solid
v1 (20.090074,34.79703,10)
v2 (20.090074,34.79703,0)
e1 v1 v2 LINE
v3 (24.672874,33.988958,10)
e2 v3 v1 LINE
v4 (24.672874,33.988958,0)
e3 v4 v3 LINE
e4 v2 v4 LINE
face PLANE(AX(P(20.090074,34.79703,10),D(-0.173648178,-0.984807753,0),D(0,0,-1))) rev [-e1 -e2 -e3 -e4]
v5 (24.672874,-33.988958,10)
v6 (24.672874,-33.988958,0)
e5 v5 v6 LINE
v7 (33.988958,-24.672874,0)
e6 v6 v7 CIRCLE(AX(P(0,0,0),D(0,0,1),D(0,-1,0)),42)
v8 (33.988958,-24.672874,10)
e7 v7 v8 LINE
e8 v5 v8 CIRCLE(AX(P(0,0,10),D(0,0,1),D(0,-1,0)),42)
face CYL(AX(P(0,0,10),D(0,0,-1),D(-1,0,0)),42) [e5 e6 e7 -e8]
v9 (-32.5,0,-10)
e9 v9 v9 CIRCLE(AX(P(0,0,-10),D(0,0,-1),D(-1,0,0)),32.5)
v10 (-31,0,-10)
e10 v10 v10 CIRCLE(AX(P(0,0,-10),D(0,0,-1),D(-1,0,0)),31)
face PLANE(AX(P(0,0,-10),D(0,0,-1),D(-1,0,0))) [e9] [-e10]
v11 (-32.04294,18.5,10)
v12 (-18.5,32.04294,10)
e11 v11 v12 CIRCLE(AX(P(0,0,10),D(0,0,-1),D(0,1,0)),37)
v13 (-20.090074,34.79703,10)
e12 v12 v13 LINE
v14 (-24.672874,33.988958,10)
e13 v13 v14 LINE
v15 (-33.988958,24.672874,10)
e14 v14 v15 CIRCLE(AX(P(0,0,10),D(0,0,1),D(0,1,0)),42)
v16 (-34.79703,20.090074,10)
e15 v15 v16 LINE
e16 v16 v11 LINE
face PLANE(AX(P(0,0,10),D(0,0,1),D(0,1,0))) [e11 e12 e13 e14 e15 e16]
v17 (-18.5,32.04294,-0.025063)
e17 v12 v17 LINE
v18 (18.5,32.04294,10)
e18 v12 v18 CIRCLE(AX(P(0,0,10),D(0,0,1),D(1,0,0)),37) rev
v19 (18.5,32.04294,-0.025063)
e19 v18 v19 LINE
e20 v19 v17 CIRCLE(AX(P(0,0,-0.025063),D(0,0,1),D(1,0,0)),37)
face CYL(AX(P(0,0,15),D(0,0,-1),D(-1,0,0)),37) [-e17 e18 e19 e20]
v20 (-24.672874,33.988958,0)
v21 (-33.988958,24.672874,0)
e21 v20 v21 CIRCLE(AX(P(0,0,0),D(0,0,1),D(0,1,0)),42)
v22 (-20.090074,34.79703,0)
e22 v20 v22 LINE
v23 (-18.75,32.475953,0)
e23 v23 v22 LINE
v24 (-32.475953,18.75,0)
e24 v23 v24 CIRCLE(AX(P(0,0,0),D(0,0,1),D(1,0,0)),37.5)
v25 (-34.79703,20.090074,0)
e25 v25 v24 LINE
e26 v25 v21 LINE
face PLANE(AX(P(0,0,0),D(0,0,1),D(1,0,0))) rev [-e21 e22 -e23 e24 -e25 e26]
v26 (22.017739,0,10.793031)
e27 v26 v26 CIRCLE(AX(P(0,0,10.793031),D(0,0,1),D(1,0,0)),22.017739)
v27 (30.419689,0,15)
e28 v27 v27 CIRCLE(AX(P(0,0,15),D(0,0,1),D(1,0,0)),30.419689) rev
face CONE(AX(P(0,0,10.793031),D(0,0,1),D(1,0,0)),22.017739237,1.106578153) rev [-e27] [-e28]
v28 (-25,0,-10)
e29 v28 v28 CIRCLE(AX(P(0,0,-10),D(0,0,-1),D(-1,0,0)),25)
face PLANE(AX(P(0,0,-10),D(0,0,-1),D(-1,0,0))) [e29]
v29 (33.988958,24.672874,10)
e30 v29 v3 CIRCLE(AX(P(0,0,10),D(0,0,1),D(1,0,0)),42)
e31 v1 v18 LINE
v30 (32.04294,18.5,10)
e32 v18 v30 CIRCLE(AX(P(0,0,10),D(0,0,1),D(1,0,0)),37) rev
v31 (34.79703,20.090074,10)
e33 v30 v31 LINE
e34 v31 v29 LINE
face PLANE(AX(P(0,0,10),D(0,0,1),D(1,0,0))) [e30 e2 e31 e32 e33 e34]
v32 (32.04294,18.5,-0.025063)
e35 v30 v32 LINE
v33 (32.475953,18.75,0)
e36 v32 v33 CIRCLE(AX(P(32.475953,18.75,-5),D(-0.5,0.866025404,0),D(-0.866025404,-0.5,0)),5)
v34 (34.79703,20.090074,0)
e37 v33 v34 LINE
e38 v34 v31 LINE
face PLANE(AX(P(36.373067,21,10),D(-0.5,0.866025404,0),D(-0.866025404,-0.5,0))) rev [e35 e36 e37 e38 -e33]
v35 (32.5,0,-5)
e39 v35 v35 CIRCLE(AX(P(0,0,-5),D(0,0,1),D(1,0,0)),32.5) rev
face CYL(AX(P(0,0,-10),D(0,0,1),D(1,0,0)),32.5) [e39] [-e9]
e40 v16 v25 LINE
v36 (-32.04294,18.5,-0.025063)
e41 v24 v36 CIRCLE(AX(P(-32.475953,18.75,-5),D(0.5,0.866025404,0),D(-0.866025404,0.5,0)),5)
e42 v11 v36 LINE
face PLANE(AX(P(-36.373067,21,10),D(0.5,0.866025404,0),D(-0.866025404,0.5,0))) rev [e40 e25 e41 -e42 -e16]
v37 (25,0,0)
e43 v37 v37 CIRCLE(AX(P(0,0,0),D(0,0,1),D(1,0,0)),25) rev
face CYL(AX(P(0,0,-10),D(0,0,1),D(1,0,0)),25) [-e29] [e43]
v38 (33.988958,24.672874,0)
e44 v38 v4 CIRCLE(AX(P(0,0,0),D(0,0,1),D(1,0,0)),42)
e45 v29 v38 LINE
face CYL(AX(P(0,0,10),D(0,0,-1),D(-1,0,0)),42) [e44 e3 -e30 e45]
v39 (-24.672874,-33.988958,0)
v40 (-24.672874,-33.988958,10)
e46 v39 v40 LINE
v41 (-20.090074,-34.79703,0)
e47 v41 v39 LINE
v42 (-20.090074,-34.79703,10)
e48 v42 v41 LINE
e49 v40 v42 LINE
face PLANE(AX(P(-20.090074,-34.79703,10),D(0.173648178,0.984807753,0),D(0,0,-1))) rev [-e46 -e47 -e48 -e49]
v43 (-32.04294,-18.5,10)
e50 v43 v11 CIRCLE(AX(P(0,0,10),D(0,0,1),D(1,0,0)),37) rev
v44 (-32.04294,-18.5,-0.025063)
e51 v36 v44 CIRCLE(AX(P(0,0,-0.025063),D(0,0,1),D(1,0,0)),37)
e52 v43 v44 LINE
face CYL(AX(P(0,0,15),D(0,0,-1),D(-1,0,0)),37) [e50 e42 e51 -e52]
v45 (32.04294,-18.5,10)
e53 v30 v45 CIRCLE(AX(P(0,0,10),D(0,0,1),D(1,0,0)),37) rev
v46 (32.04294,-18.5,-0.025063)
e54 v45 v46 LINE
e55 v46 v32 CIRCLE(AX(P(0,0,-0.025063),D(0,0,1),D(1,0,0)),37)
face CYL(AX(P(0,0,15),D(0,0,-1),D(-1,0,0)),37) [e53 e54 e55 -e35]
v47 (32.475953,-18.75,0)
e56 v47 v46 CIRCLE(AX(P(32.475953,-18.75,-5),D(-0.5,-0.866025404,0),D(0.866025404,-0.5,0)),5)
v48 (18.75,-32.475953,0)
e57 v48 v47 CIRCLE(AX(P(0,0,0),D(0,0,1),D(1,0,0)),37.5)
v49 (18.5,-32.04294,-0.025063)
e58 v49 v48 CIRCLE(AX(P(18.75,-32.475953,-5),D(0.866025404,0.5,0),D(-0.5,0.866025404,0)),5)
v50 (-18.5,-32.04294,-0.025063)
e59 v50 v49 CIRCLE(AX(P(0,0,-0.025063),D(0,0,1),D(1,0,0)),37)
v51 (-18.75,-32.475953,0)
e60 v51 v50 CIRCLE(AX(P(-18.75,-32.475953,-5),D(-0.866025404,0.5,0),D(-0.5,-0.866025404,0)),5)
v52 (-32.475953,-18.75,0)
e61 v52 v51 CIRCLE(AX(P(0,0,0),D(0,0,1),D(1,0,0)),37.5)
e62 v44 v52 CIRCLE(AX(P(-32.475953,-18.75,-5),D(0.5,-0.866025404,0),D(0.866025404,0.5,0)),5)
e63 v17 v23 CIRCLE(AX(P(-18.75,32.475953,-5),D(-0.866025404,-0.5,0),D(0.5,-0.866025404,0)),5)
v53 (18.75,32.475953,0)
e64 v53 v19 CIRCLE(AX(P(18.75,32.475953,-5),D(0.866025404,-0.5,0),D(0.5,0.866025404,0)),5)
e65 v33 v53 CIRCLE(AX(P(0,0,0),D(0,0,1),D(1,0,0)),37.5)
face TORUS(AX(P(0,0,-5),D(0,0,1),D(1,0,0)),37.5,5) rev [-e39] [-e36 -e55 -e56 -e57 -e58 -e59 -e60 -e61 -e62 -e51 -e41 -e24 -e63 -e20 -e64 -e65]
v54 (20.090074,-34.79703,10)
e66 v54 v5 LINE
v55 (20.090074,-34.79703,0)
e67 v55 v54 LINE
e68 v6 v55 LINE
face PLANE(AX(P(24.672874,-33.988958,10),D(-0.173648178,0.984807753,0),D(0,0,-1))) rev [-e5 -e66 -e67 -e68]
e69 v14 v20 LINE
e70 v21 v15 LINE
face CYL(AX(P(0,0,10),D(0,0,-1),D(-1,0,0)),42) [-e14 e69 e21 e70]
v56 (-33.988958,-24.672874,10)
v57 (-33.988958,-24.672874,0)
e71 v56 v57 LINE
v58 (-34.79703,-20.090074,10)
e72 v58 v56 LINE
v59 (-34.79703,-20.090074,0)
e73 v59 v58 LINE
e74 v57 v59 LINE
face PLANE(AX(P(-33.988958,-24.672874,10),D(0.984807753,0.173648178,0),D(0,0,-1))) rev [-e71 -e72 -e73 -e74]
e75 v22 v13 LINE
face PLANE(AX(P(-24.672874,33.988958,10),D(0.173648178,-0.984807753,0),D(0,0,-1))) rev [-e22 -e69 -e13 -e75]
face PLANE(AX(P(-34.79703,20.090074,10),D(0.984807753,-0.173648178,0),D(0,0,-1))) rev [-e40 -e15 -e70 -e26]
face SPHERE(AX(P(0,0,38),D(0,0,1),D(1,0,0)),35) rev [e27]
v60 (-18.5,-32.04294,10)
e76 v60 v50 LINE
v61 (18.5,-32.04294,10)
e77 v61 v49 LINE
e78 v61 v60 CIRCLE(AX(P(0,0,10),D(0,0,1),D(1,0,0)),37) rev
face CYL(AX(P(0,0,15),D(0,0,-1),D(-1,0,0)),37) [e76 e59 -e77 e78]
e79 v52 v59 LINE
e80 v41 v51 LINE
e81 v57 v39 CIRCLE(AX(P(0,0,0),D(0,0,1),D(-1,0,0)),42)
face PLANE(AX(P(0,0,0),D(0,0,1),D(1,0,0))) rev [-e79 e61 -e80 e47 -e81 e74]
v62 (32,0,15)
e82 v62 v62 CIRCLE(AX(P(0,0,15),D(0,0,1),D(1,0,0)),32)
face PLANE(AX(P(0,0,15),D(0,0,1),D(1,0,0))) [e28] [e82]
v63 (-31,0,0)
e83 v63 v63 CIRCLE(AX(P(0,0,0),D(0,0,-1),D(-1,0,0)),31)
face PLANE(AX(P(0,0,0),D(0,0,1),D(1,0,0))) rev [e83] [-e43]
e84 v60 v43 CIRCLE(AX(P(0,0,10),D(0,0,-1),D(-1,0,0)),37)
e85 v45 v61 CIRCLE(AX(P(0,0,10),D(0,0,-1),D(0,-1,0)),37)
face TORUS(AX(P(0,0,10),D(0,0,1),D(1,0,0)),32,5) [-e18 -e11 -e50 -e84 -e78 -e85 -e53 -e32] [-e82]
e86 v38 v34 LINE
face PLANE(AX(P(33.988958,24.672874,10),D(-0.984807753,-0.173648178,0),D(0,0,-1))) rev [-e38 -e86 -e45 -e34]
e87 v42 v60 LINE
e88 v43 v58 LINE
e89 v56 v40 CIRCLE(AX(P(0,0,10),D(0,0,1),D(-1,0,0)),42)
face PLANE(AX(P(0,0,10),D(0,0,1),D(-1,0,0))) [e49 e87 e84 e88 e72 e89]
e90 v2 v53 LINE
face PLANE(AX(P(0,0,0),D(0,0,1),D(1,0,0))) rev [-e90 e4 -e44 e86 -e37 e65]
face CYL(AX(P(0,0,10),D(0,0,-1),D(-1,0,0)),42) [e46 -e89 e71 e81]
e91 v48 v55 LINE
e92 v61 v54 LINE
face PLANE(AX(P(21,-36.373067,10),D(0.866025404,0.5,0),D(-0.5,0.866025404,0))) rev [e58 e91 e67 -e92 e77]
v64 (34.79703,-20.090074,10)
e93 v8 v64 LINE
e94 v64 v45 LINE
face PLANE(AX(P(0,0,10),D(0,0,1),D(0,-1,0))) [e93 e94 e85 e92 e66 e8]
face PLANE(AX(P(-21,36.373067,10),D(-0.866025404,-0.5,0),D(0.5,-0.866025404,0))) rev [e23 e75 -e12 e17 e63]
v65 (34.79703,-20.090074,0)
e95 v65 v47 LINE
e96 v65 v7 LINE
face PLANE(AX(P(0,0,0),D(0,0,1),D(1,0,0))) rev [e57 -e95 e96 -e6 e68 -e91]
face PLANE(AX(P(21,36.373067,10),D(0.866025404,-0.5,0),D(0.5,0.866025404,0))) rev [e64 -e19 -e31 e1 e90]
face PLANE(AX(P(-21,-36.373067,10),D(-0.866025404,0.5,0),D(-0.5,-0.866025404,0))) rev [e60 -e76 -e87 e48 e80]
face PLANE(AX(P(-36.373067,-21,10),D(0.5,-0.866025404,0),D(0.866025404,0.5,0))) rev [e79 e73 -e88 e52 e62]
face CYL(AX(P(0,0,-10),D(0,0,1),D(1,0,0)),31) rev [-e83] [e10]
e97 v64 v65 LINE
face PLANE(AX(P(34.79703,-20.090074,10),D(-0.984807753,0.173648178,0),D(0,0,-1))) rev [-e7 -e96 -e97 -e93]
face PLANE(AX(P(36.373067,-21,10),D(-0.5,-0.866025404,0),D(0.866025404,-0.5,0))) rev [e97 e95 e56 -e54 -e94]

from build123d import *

# Parameters (mm, degrees)
SKETCH_1_R                           = 37
EXTRUDE_1_DEPTH                      = 15
FILLET_2_R                           = 5
EXTRUDE_3_DEPTH                      = 10
CHAMFER_2_SIZE                       = 1.819851171
CHAMFER_3_SIZE                       = 1.819851171
PATTERN_CIRCULAR_4_COUNT             = 4
CHAMFER_2_OF_PATTERN_CIRCULAR_4_SIZE = 1.819851171
CHAMFER_3_OF_PATTERN_CIRCULAR_4_SIZE = 1.819851171
SKETCH_9_R                           = 32.5
SKETCH_9_R_2                         = 31
EXTRUDE_4_DEPTH                      = 10
SKETCH_9_3_R                         = 25
EXTRUDE_5_DEPTH                      = 10
FILLET_3_R                           = 5


with BuildPart() as part:
    # 草圖1 → 填料-伸長1 (new body)
    with BuildSketch(Plane.XY):
        Circle(SKETCH_1_R)
    extrude(amount=EXTRUDE_1_DEPTH)

    # 草圖2 → 除料-旋轉2 (revolve, cut)
    with BuildSketch(Plane.XY.offset(38)):
        with BuildLine():
            Line((-35, 0), (35, 0))
            ThreePointArc((35, 0), (0, -35), (-35, 0))
        make_face()
    revolve(axis=Axis((-35, 0, 38), (1, 0, 0)), mode=Mode.SUBTRACT)

    # 導角1: read off the stored shape, not the designer's step
    # 導角1 outline → 導角1 (revolve, cut)
    with BuildSketch(Plane.XZ):
        Polygon((22.017739237, 15), (22.017739237, 10.79303106), (30.419689063, 15), align=None)
    revolve(axis=Axis((0, 0, 0), (0, 0, 1)), mode=Mode.SUBTRACT)

    # 圓角2
    fillet_2_edges = [part.edges().sort_by_distance(p)[0] for p in [
        (-37, 0, 15),
    ]]
    fillet(fillet_2_edges, radius=FILLET_2_R)

    # 草圖8 → 填料-伸長3 (add)
    with BuildSketch(Plane.XY):
        with BuildLine():
            Line((21, 36.373066959), (18.5, 32.04293994))
            ThreePointArc((18.5, 32.04293994), (26.162950904, 26.162950904), (32.04293994, 18.5))
            Line((32.04293994, 18.5), (36.373066959, 21))
            ThreePointArc((36.373066959, 21), (29.69848481, 29.69848481), (21, 36.373066959))
        make_face()
    extrude_3 = extrude(amount=EXTRUDE_3_DEPTH)

    # 導角2
    # the kernel refuses this chamfer: 5, 1.819851171 mm, written as the material it takes off along each edge
    with BuildSketch(Plane(origin=(21, 36.373066959, -11.408988882), x_dir=(-0.5000000000000003, -0.8660254037844385, 0), z_dir=(0, 0, 1))) as chamfer_2_piece_1:
        with BuildLine():
            Line((CHAMFER_2_SIZE, 0), (0.22826162, 4.372856354))
            ThreePointArc((0.22826162, 4.372856354), (0.06200601, 2.281372415), (0, 0))
            Line((0, 0), (CHAMFER_2_SIZE, 0))
        make_face()
    extrude(amount=32.817977764, mode=Mode.SUBTRACT)

    # 導角3
    # the kernel refuses this chamfer: 5, 1.819851171 mm, written as the material it takes off along each edge
    with BuildSketch(Plane(origin=(36.373066959, 21, -11.408988882), x_dir=(-0.8660254037844387, -0.5000000000000001, 0), z_dir=(0, 0, 1))) as chamfer_3_piece_1:
        with BuildLine():
            Line((CHAMFER_3_SIZE, 0), (0.22826162, -4.372856354))
            ThreePointArc((0.22826162, -4.372856354), (0.06200601, -2.281372415), (0, 0))
            Line((0, 0), (CHAMFER_3_SIZE, 0))
        make_face()
    extrude(amount=32.817977764, mode=Mode.SUBTRACT)

    # 環狀複製排列4: 填料-伸長3 ×4 about axis
    pattern_circular_4_axis = Axis((0, 0, 0), (0, 0, 1))
    for i in range(1, PATTERN_CIRCULAR_4_COUNT):
        add(extrude_3.rotate(pattern_circular_4_axis, i * 360 / PATTERN_CIRCULAR_4_COUNT))

    # 導角2 of 環狀複製排列4
    # the kernel refuses this chamfer: 5, 1.819851171 mm, written as the material it takes off along each edge
    with BuildSketch(Plane(origin=(-36.373066959, 21, -11.408988882), x_dir=(0.5444649568890038, 0.8387835899204604, 0), z_dir=(0, 0, 1)), Plane(origin=(-21, -36.373066959, -11.408988882), x_dir=(-0.8387835899204604, 0.5444649568890038, 0), z_dir=(0, 0, 1)), Plane(origin=(36.373066959, -21, -11.408988882), x_dir=(-0.5444649568890034, -0.8387835899204606, 0), z_dir=(0, 0, 1))) as chamfer_2_of_pattern_circular_4_piece_1:
        with BuildLine():
            Line((4.378809891, 0), (CHAMFER_2_OF_PATTERN_CIRCULAR_4_SIZE * 0.0521286891855, -CHAMFER_2_OF_PATTERN_CIRCULAR_4_SIZE * 0.998640375775))
            Line((CHAMFER_2_OF_PATTERN_CIRCULAR_4_SIZE * 0.0521286891855, -CHAMFER_2_OF_PATTERN_CIRCULAR_4_SIZE * 0.998640375775), (0, 0))
            ThreePointArc((0, 0), (2.281502898, 0.057003248), (4.378809891, 0))
        make_face()
    extrude(amount=32.817977764, mode=Mode.SUBTRACT)

    # 導角3 of 環狀複製排列4
    # the kernel refuses this chamfer: 5, 1.819851171 mm, written as the material it takes off along each edge
    with BuildSketch(Plane(origin=(-21, 36.373066959, -11.408988882), x_dir=(0.5000000000000001, -0.8660254037844387, 0), z_dir=(0, 0, 1))) as chamfer_3_of_pattern_circular_4_piece_1:
        with BuildLine():
            Line((CHAMFER_3_OF_PATTERN_CIRCULAR_4_SIZE, 0), (0.22826162, -4.372856354))
            ThreePointArc((0.22826162, -4.372856354), (0.06200601, -2.281372415), (0, 0))
            Line((0, 0), (CHAMFER_3_OF_PATTERN_CIRCULAR_4_SIZE, 0))
        make_face()
    extrude(amount=32.817977764, mode=Mode.SUBTRACT)
    with BuildSketch(Plane(origin=(-36.373066959, -21, -11.408988882), x_dir=(0.5444649568890013, -0.8387835899204622, 0), z_dir=(0, 0, 1)), Plane(origin=(21, -36.373066959, -11.408988882), x_dir=(0.8387835899204622, 0.5444649568890012, 0), z_dir=(0, 0, 1))) as chamfer_3_of_pattern_circular_4_piece_2:
        with BuildLine():
            Line((4.378809891, 0), (CHAMFER_3_OF_PATTERN_CIRCULAR_4_SIZE * 0.0521286891855, CHAMFER_3_OF_PATTERN_CIRCULAR_4_SIZE * 0.998640375775))
            Line((CHAMFER_3_OF_PATTERN_CIRCULAR_4_SIZE * 0.0521286891855, CHAMFER_3_OF_PATTERN_CIRCULAR_4_SIZE * 0.998640375775), (0, 0))
            ThreePointArc((0, 0), (2.281502898, -0.057003248), (4.378809891, 0))
        make_face()
    extrude(amount=32.817977764, mode=Mode.SUBTRACT)

    # 草圖9 → 填料-伸長4 (add)
    with BuildSketch(Plane(origin=(0, 0, 0), x_dir=(-1, 0, 0), z_dir=(0, 0, -1))):
        with Locations(Location((0, 0, 0), (0, 0, 180))):
            Circle(SKETCH_9_R)
        Circle(SKETCH_9_R_2, mode=Mode.SUBTRACT)
    extrude(amount=EXTRUDE_4_DEPTH)

    # 草圖9<3> → 填料-伸長5 (add)
    with BuildSketch(Plane(origin=(0, 0, 0), x_dir=(-1, 0, 0), z_dir=(0, 0, -1))):
        with Locations(Location((0, 0, 0), (0, 0, 180))):
            Circle(SKETCH_9_3_R)
    extrude(amount=EXTRUDE_5_DEPTH)

    # 圓角3
    # the kernel refuses this fillet: 5 mm, written as the material it adds along each edge
    with BuildSketch(Plane(origin=(0, 0, 0), x_dir=(1, 0, 0), z_dir=(0, 1, 0))) as fillet_3_piece_1_section:
        with BuildLine():
            CenterArc((32.5 + FILLET_3_R, FILLET_3_R), FILLET_3_R, 180, 90)
            Line((32.5, FILLET_3_R), (32.5, 0))
            Line((32.5, 0), (32.5 + FILLET_3_R, 0))
        make_face()
    fillet_3_piece_1 = revolve(axis=Axis((0, 0, 0), (0, 0, -1)), mode=Mode.PRIVATE)
    fillet_3_piece_1 = fillet_3_piece_1 & Plane(origin=(0, 0, 0), x_dir=(1, 0, 0), z_dir=(0, 0, -1)) * Cylinder(37, 150, mode=Mode.PRIVATE)
    add(fillet_3_piece_1)
    with BuildSketch(Plane(origin=(0, 0, 0), x_dir=(1, 0, 0), z_dir=(0, 1, 0))) as fillet_3_piece_2_section:
        with BuildLine():
            CenterArc((32.5 + FILLET_3_R, FILLET_3_R), FILLET_3_R, 180, 90)
            Line((32.5, FILLET_3_R), (32.5, 0))
            Line((32.5, 0), (32.5 + FILLET_3_R, 0))
        make_face()
    fillet_3_piece_2 = revolve(axis=Axis((0, 0, 0), (0, 0, -1)), mode=Mode.PRIVATE)
    fillet_3_piece_2 = split(fillet_3_piece_2, bisect_by=Plane(origin=(0, 0, 0), z_dir=(0.8660254037844387, 0.5000000000000001, 0)), keep=Keep.TOP, mode=Mode.PRIVATE)
    fillet_3_piece_2 = split(fillet_3_piece_2, bisect_by=Plane(origin=(0, 0, 0), z_dir=(-0.4999999999999997, -0.8660254037844389, 0)), keep=Keep.TOP, mode=Mode.PRIVATE)
    add(fillet_3_piece_2)
    with BuildSketch(Plane(origin=(0, 0, 0), x_dir=(1, 0, 0), z_dir=(0, 1, 0))) as fillet_3_piece_3_section:
        with BuildLine():
            CenterArc((32.5 + FILLET_3_R, FILLET_3_R), FILLET_3_R, 180, 90)
            Line((32.5, FILLET_3_R), (32.5, 0))
            Line((32.5, 0), (32.5 + FILLET_3_R, 0))
        make_face()
    fillet_3_piece_3 = revolve(axis=Axis((0, 0, 0), (0, 0, -1)), mode=Mode.PRIVATE)
    fillet_3_piece_3 = split(fillet_3_piece_3, bisect_by=Plane(origin=(0, 0, 0), z_dir=(0.8660254037844388, -0.4999999999999997, 0)), keep=Keep.TOP, mode=Mode.PRIVATE)
    fillet_3_piece_3 = split(fillet_3_piece_3, bisect_by=Plane(origin=(0, 0, 0), z_dir=(-0.5000000000000001, 0.8660254037844386, 0)), keep=Keep.TOP, mode=Mode.PRIVATE)
    add(fillet_3_piece_3)
    with BuildSketch(Plane(origin=(0, 0, 0), x_dir=(1, 0, 0), z_dir=(0, 1, 0))) as fillet_3_piece_4_section:
        with BuildLine():
            CenterArc((32.5 + FILLET_3_R, FILLET_3_R), FILLET_3_R, 180, 90)
            Line((32.5, FILLET_3_R), (32.5, 0))
            Line((32.5, 0), (32.5 + FILLET_3_R, 0))
        make_face()
    fillet_3_piece_4 = revolve(axis=Axis((0, 0, 0), (0, 0, -1)), mode=Mode.PRIVATE)
    fillet_3_piece_4 = split(fillet_3_piece_4, bisect_by=Plane(origin=(0, 0, 0), z_dir=(-0.8660254037844388, 0.4999999999999997, 0)), keep=Keep.TOP, mode=Mode.PRIVATE)
    fillet_3_piece_4 = split(fillet_3_piece_4, bisect_by=Plane(origin=(0, 0, 0), z_dir=(0.5000000000000001, -0.8660254037844386, 0)), keep=Keep.TOP, mode=Mode.PRIVATE)
    add(fillet_3_piece_4)
    with BuildSketch(Plane(origin=(0, 0, 0), x_dir=(1, 0, 0), z_dir=(0, 1, 0))) as fillet_3_piece_5_section:
        with BuildLine():
            CenterArc((32.5 + FILLET_3_R, FILLET_3_R), FILLET_3_R, 180, 90)
            Line((32.5, FILLET_3_R), (32.5, 0))
            Line((32.5, 0), (32.5 + FILLET_3_R, 0))
        make_face()
    fillet_3_piece_5 = revolve(axis=Axis((0, 0, 0), (0, 0, -1)), mode=Mode.PRIVATE)
    fillet_3_piece_5 = split(fillet_3_piece_5, bisect_by=Plane(origin=(0, 0, 0), z_dir=(-0.8660254037844387, -0.5000000000000001, 0)), keep=Keep.TOP, mode=Mode.PRIVATE)
    fillet_3_piece_5 = split(fillet_3_piece_5, bisect_by=Plane(origin=(0, 0, 0), z_dir=(0.4999999999999997, 0.8660254037844389, 0)), keep=Keep.TOP, mode=Mode.PRIVATE)
    add(fillet_3_piece_5)


solid = part.part
